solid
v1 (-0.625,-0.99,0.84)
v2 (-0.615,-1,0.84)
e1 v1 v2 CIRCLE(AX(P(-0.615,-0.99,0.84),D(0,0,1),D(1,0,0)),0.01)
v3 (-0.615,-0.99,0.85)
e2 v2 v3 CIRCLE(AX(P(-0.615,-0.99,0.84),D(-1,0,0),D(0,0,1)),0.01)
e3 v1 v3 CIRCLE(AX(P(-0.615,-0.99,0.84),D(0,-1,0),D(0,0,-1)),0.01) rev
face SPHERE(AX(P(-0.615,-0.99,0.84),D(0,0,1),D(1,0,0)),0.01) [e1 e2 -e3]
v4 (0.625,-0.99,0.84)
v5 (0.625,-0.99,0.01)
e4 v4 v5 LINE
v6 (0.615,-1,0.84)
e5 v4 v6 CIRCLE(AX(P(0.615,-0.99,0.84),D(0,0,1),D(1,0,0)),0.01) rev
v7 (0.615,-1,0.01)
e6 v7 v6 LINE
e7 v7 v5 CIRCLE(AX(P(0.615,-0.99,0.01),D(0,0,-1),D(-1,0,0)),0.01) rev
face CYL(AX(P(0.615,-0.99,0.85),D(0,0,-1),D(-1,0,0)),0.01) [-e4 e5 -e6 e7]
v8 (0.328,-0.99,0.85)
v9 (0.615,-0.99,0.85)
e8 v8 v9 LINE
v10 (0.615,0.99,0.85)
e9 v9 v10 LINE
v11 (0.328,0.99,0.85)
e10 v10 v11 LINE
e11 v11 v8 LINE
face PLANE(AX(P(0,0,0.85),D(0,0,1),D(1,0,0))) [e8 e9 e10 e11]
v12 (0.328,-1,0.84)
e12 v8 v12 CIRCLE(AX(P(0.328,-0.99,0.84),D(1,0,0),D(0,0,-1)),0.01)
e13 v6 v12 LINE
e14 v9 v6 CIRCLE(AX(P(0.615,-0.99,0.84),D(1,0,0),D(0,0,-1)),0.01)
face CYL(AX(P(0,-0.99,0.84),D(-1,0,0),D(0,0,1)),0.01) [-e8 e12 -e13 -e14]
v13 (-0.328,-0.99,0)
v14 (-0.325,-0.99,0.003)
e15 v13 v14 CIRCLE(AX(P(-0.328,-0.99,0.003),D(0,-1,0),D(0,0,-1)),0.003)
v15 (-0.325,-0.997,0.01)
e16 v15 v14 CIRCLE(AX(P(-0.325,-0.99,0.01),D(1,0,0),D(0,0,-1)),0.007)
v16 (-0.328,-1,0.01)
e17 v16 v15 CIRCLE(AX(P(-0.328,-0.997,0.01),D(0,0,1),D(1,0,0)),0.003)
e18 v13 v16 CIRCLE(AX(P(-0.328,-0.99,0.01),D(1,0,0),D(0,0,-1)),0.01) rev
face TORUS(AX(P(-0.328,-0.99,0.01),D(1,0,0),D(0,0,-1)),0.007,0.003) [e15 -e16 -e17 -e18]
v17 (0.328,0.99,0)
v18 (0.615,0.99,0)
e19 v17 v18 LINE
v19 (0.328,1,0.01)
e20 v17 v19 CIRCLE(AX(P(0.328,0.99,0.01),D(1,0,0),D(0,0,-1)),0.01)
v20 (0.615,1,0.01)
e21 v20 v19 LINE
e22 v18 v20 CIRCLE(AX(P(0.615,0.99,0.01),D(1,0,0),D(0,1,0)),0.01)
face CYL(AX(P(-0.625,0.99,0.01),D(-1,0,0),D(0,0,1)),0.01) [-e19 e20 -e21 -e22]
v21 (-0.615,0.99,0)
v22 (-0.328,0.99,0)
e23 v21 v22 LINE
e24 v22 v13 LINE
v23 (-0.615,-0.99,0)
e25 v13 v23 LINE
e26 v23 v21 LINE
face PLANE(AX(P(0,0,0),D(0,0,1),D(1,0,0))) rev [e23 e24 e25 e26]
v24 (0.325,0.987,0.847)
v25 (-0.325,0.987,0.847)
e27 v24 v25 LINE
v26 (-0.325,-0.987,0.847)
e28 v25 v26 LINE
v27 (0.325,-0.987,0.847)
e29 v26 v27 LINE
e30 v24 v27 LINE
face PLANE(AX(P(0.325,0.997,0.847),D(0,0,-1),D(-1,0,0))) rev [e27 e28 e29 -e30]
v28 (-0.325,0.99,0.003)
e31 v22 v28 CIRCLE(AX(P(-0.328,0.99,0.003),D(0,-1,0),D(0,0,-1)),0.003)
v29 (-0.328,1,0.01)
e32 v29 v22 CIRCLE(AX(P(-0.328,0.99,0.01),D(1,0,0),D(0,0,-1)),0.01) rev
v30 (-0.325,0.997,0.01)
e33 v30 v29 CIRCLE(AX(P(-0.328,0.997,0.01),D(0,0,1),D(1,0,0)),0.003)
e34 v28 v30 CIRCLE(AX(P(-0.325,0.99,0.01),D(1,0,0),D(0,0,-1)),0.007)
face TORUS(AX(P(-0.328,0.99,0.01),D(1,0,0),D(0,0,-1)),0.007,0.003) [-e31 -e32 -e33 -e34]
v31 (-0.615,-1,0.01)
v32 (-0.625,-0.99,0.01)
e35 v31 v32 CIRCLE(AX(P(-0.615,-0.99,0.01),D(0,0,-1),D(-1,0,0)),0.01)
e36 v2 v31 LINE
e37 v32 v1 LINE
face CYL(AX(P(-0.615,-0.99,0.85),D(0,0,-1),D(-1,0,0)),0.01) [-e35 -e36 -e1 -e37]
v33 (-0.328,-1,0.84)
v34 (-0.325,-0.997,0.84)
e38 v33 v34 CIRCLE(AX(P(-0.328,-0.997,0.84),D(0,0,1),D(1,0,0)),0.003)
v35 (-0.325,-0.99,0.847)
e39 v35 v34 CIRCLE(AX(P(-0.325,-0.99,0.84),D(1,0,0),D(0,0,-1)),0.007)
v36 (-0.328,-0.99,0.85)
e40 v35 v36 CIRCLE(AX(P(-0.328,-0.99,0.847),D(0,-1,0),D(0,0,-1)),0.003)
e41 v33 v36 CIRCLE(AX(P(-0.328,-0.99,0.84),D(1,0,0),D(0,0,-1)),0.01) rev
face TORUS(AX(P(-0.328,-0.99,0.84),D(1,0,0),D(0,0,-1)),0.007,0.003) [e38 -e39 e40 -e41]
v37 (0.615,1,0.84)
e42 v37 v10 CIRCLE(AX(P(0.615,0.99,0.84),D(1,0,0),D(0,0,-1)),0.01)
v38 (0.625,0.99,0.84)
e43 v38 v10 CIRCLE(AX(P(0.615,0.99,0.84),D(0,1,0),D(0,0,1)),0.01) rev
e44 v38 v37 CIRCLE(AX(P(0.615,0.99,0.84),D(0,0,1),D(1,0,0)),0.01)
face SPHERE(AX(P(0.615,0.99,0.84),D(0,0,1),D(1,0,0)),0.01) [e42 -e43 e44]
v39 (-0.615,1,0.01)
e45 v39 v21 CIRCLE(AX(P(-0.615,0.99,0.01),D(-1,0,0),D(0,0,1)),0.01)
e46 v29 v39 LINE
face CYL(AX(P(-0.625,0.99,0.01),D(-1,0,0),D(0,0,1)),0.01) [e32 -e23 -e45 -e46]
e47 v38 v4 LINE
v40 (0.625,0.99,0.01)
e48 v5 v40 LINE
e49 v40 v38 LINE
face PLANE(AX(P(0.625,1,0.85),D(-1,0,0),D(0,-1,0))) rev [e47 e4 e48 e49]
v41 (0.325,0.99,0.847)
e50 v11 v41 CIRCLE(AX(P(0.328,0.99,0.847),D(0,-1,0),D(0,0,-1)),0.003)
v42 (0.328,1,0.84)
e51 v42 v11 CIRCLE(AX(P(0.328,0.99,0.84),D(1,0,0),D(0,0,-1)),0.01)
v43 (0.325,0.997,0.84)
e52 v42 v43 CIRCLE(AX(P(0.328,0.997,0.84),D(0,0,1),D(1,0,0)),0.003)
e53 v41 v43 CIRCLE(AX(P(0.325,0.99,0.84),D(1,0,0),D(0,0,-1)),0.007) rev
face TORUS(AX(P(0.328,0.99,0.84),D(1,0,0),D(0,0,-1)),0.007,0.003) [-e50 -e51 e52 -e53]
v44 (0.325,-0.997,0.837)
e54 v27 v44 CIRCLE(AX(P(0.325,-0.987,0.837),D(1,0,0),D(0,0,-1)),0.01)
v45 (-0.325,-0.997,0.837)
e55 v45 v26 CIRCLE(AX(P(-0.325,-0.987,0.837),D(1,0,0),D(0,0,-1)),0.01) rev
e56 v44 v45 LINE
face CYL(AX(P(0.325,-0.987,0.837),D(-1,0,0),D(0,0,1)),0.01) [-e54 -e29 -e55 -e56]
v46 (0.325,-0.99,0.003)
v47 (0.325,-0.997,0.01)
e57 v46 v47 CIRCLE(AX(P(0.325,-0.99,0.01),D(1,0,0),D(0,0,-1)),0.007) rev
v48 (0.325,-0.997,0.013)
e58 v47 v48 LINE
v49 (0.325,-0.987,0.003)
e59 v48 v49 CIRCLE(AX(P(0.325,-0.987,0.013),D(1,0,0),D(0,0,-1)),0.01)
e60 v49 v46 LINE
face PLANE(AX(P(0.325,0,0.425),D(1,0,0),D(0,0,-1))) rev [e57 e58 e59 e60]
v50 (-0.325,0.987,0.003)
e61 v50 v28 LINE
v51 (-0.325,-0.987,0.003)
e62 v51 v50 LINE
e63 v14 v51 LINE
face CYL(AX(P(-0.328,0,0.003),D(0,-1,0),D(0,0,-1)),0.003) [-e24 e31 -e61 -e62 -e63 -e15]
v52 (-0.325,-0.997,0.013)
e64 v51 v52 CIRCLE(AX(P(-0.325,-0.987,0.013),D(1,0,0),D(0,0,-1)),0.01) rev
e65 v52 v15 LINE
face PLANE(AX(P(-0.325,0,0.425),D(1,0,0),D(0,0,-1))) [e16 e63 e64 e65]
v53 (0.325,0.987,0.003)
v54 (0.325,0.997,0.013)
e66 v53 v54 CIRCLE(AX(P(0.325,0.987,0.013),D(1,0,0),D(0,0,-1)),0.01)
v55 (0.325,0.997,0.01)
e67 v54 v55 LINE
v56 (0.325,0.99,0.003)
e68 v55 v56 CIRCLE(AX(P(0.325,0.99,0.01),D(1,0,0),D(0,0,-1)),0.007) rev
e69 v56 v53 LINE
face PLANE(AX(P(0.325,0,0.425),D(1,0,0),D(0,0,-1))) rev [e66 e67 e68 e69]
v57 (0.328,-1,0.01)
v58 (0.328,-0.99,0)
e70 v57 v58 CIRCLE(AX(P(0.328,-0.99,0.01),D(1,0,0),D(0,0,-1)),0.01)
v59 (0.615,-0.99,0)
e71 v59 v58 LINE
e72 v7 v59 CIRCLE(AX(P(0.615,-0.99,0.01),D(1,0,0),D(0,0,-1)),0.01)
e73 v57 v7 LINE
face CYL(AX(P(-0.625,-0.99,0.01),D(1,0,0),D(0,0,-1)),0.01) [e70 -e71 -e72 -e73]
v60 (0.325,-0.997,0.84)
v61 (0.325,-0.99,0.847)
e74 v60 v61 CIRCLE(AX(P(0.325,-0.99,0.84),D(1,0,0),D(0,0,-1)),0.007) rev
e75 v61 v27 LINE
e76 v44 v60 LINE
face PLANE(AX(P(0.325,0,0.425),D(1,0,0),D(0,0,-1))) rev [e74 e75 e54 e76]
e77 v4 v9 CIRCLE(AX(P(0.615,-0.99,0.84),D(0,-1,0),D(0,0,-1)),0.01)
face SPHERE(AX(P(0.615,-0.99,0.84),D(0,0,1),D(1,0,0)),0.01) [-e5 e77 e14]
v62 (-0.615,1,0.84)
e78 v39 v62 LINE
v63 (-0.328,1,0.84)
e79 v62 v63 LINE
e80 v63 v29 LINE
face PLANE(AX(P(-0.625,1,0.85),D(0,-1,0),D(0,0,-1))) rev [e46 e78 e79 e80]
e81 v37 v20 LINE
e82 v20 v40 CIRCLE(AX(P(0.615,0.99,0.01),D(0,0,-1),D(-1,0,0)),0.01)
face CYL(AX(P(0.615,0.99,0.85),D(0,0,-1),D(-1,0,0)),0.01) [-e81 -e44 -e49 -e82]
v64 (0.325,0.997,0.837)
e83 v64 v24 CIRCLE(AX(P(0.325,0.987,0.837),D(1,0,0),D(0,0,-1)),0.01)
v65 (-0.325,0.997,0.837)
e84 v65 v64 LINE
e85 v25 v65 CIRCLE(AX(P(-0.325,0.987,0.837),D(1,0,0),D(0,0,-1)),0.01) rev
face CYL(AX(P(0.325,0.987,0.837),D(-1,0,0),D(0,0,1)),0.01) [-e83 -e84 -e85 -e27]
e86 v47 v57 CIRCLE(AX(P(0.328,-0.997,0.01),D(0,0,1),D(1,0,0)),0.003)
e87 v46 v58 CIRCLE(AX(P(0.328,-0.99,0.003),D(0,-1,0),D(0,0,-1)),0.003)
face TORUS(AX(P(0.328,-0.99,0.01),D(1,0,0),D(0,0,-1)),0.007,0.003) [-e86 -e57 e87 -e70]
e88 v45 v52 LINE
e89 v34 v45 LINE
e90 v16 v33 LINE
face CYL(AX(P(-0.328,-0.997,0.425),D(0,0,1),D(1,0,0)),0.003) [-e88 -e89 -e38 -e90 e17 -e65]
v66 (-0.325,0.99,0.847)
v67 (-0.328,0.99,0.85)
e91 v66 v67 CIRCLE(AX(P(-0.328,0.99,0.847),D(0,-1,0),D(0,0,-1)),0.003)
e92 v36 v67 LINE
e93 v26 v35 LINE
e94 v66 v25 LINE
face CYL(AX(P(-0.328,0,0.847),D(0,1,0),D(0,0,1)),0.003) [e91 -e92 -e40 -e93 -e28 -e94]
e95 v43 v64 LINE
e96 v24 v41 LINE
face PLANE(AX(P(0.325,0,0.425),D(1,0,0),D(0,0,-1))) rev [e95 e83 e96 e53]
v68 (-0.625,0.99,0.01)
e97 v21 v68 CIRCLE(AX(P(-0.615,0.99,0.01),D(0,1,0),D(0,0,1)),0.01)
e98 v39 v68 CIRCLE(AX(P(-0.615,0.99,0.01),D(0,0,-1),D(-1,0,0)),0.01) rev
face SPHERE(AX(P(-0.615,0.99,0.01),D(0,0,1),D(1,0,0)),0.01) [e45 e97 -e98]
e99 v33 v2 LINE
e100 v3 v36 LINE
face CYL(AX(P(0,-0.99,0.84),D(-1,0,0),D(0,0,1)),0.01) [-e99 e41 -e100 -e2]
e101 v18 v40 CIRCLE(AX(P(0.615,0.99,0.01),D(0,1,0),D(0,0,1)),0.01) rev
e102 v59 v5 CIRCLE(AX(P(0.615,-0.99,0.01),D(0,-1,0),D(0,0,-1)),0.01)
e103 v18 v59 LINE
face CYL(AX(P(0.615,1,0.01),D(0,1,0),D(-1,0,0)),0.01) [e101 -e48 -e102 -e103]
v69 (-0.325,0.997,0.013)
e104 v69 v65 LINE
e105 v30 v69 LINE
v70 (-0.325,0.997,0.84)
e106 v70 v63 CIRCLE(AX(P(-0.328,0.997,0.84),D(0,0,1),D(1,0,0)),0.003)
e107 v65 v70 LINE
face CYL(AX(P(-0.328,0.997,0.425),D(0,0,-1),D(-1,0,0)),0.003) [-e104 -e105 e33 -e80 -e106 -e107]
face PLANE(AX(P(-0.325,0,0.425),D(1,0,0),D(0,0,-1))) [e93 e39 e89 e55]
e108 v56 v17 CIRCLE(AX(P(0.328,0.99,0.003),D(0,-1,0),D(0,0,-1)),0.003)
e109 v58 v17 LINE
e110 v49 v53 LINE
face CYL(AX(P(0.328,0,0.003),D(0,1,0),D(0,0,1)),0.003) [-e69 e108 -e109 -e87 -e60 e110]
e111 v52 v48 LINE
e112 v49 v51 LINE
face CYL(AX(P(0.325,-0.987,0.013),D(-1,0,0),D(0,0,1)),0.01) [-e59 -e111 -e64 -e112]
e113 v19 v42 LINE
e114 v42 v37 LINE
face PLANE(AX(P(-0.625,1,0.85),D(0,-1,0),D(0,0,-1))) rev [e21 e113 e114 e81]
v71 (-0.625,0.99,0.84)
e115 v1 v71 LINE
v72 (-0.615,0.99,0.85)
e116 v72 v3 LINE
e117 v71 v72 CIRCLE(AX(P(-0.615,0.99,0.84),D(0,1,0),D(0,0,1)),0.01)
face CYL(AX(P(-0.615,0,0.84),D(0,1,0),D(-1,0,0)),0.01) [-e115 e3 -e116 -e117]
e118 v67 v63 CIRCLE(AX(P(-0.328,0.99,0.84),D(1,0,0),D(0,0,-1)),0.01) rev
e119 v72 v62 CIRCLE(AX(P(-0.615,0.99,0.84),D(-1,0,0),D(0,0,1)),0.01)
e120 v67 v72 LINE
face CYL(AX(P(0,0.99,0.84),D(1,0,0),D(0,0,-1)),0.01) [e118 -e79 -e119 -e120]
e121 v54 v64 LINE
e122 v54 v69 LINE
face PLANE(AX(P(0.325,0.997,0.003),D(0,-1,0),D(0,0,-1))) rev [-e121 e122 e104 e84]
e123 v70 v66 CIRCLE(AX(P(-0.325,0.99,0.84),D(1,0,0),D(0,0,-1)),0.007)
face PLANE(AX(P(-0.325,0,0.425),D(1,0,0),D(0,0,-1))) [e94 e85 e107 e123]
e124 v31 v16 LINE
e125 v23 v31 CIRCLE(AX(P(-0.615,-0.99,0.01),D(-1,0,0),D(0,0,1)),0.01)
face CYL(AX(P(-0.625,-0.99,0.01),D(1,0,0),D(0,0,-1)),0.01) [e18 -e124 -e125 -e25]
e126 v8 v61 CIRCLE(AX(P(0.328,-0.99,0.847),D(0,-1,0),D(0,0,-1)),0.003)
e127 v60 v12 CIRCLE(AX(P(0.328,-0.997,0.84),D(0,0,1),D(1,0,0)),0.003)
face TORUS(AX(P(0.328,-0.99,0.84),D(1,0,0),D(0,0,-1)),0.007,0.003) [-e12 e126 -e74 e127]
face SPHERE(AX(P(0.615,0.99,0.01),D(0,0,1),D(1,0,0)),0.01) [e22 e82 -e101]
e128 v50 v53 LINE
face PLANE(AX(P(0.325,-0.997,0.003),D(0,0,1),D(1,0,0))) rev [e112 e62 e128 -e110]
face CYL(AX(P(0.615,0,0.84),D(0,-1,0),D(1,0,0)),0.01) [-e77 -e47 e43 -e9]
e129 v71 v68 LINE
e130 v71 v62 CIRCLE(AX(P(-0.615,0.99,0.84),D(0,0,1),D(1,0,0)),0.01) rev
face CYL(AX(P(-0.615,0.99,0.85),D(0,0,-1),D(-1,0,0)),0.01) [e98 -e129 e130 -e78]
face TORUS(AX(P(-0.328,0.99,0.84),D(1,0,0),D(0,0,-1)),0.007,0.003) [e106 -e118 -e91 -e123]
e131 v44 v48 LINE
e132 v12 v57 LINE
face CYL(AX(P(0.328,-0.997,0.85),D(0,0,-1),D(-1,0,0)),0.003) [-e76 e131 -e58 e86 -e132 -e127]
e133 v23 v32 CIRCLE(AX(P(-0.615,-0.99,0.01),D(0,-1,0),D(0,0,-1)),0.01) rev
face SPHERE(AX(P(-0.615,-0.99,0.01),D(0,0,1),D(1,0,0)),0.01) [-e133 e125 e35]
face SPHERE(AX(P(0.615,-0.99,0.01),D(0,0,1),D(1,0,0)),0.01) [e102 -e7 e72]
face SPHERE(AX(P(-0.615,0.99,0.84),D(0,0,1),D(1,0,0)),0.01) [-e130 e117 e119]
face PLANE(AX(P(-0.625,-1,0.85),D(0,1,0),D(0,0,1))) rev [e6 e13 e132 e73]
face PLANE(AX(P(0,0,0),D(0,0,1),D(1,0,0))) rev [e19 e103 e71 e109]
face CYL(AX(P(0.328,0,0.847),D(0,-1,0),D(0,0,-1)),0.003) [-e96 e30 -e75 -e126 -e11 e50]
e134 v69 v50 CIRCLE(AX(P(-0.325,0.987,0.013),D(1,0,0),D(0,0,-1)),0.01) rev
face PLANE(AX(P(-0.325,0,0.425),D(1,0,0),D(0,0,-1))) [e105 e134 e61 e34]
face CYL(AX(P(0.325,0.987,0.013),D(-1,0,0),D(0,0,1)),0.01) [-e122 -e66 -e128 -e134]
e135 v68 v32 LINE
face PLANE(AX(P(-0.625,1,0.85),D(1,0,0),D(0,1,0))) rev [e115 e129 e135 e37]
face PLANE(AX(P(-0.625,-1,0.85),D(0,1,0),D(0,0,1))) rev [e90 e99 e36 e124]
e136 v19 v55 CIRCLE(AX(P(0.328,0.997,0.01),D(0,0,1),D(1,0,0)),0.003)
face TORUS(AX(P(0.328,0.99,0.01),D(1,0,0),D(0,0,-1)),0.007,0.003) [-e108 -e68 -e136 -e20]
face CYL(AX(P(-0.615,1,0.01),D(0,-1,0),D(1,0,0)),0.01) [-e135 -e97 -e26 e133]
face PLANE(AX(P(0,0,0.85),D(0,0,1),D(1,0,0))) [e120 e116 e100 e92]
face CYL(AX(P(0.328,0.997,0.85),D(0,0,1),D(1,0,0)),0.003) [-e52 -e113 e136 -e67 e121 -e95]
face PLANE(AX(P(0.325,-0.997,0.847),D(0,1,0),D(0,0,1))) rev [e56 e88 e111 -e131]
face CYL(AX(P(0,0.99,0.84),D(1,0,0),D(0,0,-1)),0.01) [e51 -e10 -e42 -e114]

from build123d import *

# Parameters (mm, degrees)
SKETCH1_W                           = 1.25
SKETCH1_H                           = 2
ALL_BODY_DEPTH                      = 0.85
CUT_OUT_THE_BODY_FOR_PIN_DEPTH      = 0.325
CUT_OUT_THE_BODY_FOR_PIN_DEPTH_BACK = 0.325
SKETCH2_OUTSIDE_W                   = 3.352
SKETCH2_OUTSIDE_H                   = 4.502
SKETCH2_OUTSIDE_W_2                 = 0.844
SKETCH2_OUTSIDE_H_2                 = 1.994
BODY_FILLET_R                       = 0.01
PIN_FILLET_A_R                      = 0.01
PIN_FILLET_B_R                      = 0.003


with BuildPart() as part:
    # Sketch1 → All body (new body)
    with BuildSketch(Plane.XY):
        Rectangle(SKETCH1_W, SKETCH1_H)
    extrude(amount=ALL_BODY_DEPTH)

    # Sketch2 outside → Cut out the body for pin (cut, two sides: drawn at the far end of the back side and taken through both)
    with BuildSketch(Plane(origin=(0, 0, 0), x_dir=(0, 0, -1), z_dir=(1, 0, 0)).offset(-CUT_OUT_THE_BODY_FOR_PIN_DEPTH_BACK)):
        with Locations((-0.425, 0)):
            Rectangle(SKETCH2_OUTSIDE_W, SKETCH2_OUTSIDE_H)
        with Locations((-0.425, 0)):
            Rectangle(SKETCH2_OUTSIDE_W_2, SKETCH2_OUTSIDE_H_2, mode=Mode.SUBTRACT)
    extrude(amount=CUT_OUT_THE_BODY_FOR_PIN_DEPTH + CUT_OUT_THE_BODY_FOR_PIN_DEPTH_BACK, mode=Mode.SUBTRACT)

    # Body fillet
    body_fillet_edges = [part.edges().sort_by_distance(p)[0] for p in [
        (0, 0.997, 0.003),
        (0, 0.997, 0.847),
        (0, -0.997, 0.847),
        (0, -0.997, 0.003),
    ]]
    fillet(body_fillet_edges, radius=BODY_FILLET_R)

    # Pin fillet a
    pin_fillet_a_edges = [part.edges().sort_by_distance(p)[0] for p in [
        (0.625, 0, 0.85),
        (-0.475, 1, 0),
        (0.475, -1, 0),
        (0.475, -1, 0.85),
        (-0.475, 1, 0.85),
        (0.475, 1, 0.85),
        (-0.625, 0, 0.85),
        (0.475, 1, 0),
        (0.625, 0, 0),
        (-0.475, -1, 0),
        (-0.625, 0, 0),
        (-0.625, 1, 0.425),
        (0.625, 1, 0.425),
        (0.625, -1, 0.425),
        (-0.625, -1, 0.425),
        (-0.475, -1, 0.85),
    ]]
    fillet(pin_fillet_a_edges, radius=PIN_FILLET_A_R)

    # Pin fillet b
    pin_fillet_b_edges = [part.edges().sort_by_distance(p)[0] for p in [
        (0.325, -1, 0.425),
        (0.325, 0, 0.85),
        (0.325, 1, 0.425),
        (0.325, 0, 0),
        (-0.325, 1, 0.425),
        (-0.325, 0, 0.85),
        (-0.325, -1, 0.425),
        (-0.325, 0, 0),
        (0.325, 0.997071068, 0.002928932),
        (0.325, -0.997071068, 0.002928932),
        (0.325, -0.997071068, 0.847071068),
        (0.325, 0.997071068, 0.847071068),
        (-0.325, -0.997071068, 0.847071068),
        (-0.325, 0.997071068, 0.847071068),
        (-0.325, -0.997071068, 0.002928932),
        (-0.325, 0.997071068, 0.002928932),
    ]]
    fillet(pin_fillet_b_edges, radius=PIN_FILLET_B_R - 0.0001)  # a hair under: the kernel refuses the full size


solid = part.part
